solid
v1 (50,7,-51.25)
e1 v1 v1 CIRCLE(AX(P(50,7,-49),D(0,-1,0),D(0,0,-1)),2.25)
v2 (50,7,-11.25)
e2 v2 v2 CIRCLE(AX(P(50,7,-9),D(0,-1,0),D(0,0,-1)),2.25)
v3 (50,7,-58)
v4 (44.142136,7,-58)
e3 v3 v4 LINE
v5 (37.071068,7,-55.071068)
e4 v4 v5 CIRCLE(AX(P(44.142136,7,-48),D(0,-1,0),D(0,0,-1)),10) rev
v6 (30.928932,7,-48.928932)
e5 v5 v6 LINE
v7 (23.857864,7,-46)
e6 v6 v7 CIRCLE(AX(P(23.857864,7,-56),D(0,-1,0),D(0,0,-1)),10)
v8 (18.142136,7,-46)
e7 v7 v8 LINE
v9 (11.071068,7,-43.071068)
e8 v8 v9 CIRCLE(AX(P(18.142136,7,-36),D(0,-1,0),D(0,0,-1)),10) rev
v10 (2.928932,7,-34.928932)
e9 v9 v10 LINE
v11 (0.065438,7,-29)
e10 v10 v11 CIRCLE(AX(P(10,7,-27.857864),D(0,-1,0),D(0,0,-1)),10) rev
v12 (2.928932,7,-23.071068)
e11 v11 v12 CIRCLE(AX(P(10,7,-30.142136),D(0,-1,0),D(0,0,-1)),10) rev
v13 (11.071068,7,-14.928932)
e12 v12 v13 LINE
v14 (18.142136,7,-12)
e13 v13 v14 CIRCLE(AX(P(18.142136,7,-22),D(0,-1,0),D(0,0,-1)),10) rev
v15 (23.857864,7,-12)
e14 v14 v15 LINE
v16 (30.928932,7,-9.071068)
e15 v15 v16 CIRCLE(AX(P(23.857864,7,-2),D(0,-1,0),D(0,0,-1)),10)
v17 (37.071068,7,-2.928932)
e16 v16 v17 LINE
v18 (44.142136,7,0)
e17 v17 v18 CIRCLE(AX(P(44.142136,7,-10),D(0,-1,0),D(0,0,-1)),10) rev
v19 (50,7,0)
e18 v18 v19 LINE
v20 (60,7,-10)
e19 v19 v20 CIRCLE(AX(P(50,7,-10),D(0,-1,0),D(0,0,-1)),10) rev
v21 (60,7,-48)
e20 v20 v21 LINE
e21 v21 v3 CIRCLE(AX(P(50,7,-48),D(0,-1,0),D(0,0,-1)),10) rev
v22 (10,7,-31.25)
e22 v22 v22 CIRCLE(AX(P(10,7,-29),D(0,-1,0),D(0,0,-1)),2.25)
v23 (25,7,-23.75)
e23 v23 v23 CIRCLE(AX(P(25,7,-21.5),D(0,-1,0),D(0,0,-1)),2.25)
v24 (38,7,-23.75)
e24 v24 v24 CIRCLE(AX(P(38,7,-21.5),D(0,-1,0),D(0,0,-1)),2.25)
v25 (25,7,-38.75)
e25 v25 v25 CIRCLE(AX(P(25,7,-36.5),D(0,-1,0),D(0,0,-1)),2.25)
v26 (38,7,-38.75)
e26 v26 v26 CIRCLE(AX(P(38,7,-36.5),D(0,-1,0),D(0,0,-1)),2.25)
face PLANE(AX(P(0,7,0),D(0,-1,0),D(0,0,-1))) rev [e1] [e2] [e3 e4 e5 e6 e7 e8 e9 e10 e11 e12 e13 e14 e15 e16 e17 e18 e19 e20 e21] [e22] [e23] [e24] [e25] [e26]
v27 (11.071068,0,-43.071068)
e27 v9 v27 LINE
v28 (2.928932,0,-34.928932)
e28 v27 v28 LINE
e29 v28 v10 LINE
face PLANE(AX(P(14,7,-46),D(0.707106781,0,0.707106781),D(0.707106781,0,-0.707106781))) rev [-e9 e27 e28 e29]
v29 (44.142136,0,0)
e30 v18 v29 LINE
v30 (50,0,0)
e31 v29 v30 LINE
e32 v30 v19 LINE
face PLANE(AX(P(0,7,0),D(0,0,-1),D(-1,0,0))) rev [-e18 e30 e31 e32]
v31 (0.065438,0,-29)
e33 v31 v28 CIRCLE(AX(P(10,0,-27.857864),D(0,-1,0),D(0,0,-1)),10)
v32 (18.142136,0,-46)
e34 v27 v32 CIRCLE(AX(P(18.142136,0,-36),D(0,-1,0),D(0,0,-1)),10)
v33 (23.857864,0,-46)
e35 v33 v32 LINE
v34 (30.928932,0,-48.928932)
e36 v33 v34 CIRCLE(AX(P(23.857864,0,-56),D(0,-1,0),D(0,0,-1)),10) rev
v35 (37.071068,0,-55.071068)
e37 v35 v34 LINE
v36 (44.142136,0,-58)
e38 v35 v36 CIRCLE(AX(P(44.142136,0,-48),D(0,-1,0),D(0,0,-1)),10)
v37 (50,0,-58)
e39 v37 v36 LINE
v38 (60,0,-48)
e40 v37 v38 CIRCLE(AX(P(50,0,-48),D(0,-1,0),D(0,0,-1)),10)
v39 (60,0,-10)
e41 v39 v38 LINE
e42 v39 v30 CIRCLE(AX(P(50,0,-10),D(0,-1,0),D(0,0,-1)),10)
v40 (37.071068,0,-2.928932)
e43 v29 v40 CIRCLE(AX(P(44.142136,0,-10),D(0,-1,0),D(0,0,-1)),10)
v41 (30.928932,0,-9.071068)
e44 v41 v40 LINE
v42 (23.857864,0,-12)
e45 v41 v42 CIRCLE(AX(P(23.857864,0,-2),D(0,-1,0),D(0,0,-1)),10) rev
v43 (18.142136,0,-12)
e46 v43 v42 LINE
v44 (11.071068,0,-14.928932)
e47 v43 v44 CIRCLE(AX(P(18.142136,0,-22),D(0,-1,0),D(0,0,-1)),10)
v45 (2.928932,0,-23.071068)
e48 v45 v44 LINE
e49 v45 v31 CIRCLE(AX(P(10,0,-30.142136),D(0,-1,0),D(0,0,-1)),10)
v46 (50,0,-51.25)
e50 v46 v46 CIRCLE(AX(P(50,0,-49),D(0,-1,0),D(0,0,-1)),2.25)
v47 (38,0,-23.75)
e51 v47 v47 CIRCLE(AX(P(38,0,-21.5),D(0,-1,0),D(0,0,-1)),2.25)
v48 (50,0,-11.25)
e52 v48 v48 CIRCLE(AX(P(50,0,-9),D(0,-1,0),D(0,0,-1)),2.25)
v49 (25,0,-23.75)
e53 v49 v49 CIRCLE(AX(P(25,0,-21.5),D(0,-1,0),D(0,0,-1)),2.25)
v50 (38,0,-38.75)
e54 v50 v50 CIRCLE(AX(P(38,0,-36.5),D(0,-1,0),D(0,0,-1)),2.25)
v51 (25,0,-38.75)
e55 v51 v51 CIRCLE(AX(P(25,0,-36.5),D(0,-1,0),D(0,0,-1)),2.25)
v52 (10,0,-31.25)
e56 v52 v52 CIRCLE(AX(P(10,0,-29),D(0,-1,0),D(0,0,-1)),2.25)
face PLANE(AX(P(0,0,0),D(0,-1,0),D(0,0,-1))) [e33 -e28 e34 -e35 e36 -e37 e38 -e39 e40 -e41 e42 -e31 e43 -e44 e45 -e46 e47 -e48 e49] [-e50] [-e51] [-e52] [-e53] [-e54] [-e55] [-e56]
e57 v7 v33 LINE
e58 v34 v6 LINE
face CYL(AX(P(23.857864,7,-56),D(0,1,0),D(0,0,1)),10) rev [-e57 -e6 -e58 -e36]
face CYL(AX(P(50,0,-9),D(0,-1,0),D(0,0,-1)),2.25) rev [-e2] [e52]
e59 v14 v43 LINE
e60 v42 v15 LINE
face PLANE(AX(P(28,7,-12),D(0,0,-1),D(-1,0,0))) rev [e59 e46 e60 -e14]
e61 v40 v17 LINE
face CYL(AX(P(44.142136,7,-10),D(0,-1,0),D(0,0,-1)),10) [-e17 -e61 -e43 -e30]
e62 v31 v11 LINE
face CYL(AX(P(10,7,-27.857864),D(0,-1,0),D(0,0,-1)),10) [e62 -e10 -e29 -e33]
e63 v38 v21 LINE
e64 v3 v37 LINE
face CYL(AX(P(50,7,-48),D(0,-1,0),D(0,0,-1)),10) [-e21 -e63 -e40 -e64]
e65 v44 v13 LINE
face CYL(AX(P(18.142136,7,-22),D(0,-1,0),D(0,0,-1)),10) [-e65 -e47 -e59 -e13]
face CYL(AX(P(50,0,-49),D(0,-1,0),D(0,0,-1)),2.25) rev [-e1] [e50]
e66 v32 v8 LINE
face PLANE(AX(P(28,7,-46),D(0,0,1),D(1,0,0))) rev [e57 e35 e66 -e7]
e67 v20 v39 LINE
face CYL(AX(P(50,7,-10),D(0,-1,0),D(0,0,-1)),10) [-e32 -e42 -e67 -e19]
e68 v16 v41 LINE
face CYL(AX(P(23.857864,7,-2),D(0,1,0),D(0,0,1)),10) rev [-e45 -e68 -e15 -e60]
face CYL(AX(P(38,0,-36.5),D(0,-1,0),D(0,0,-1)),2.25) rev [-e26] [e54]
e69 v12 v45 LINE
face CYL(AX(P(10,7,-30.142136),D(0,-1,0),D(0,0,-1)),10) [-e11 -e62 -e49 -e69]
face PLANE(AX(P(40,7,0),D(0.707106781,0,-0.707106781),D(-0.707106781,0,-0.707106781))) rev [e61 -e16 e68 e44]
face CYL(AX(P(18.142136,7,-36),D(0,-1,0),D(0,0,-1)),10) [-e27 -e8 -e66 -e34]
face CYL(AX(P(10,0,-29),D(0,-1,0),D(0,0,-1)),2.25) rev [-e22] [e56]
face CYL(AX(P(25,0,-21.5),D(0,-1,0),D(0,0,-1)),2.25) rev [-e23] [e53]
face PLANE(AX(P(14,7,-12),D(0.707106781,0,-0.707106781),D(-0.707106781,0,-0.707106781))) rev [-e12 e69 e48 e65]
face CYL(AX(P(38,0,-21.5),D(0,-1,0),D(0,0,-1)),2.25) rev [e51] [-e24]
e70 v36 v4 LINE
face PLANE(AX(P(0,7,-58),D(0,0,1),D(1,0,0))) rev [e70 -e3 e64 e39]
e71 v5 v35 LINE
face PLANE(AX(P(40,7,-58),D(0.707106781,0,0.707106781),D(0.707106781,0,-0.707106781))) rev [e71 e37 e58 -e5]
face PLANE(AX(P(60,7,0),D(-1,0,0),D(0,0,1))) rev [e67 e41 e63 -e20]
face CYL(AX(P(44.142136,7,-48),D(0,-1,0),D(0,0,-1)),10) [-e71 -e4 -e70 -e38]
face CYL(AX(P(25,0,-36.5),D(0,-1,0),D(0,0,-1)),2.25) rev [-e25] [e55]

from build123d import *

# Parameters (mm, degrees)
SKETCH1_W            = 60
SKETCH1_H            = 58
BOSS_EXTRUDE1_DEPTH  = 7
M4_CLEARANCE_HOLE2_D = 4.5
LPATTERN1_COUNT      = 2
LPATTERN1_PITCH      = 13
M4_CLEARANCE_HOLE4_D = 4.5
CUT_EXTRUDE5_DEPTH   = 84.743656476
FILLET3_R            = 10


with BuildPart() as part:
    # Sketch1 → Boss-Extrude1 (new body)
    with BuildSketch(Plane(origin=(0, 0, 0), x_dir=(1, 0, 0), z_dir=(0, 1, 0))):
        with Locations((30, 29)):
            Rectangle(SKETCH1_W, SKETCH1_H)
    extrude(amount=BOSS_EXTRUDE1_DEPTH)

    # M4 Clearance Hole2 (through all)
    with Locations(Plane(origin=(0, 0, 0), x_dir=(-1, 0, 0), z_dir=(0, -1, 0))):
        with Locations((-25, 36.5), (-25, 21.5)):
            m4_clearance_hole2 = Hole(M4_CLEARANCE_HOLE2_D / 2)

    # LPattern1: M4 Clearance Hole2 ×2
    with Locations(*[(i * LPATTERN1_PITCH, 0, 0) for i in range(1, LPATTERN1_COUNT)]):
        add(m4_clearance_hole2, mode=Mode.SUBTRACT)

    # M4 Clearance Hole4 (through all)
    with Locations(Plane(origin=(0, 0, 0), x_dir=(-1, 0, 0), z_dir=(0, -1, 0))):
        with Locations((-50, 49), (-50, 9), (-10, 29)):
            Hole(M4_CLEARANCE_HOLE4_D / 2)

    # Sketch29 → Cut-Extrude5 (cut, through all)
    with BuildSketch(Plane.XZ):
        Polygon((40, 0), (28, -12), (14, -12), (0, -26), (0, 0), align=None)
        Polygon((0, -32), (0, -58), (40, -58), (28, -46), (14, -46), align=None)
    extrude(amount=-CUT_EXTRUDE5_DEPTH, mode=Mode.SUBTRACT)

    # Fillet3
    # the kernel refuses this fillet: 10 mm, written as the material it adds along each edge
    with BuildSketch(Plane(origin=(28, 0, -46), x_dir=(-1, 0, 0), z_dir=(0, 1, 0)), Plane(origin=(28, 0, -12), x_dir=(0.7071067811865417, 0, 0.7071067811865532), z_dir=(0, 1, 0))) as fillet3_piece_1:
        with BuildLine():
            CenterArc((FILLET3_R * 0.414213562373, -FILLET3_R), FILLET3_R, 90, 45)
            Line((-FILLET3_R * 0.292893218813, -FILLET3_R * 0.292893218813), (0, 0))
            Line((0, 0), (FILLET3_R * 0.414213562373, 0))
        make_face()
    extrude(amount=7)
    # the kernel refuses this fillet: 10 mm, written as the material it takes off along each edge
    with BuildSketch(Plane(origin=(60, -25, 0), x_dir=(-1, 0, 0), z_dir=(0, 1, 0)), Plane(origin=(60, -25, -58), x_dir=(0, 0, 1), z_dir=(0, 1, 0))) as fillet3_2_piece_1:
        with BuildLine():
            CenterArc((FILLET3_R, -FILLET3_R), FILLET3_R, 90, 90)
            Line((0, -FILLET3_R), (0, 0))
            Line((0, 0), (FILLET3_R, 0))
        make_face()
    extrude(amount=57, mode=Mode.SUBTRACT)
    with BuildSketch(Plane(origin=(40, -10.355339059, -58), x_dir=(-0.7071067811865415, 0, 0.7071067811865536), z_dir=(0, 1, 0)), Plane(origin=(14, -10.355339059, -46), x_dir=(-0.7071067811865411, 0, 0.707106781186554), z_dir=(0, 1, 0)), Plane(origin=(0, -10.355339059, -32), x_dir=(0, 0, 1), z_dir=(0, 1, 0)), Plane(origin=(0, -10.355339059, -26), x_dir=(0.7071067811865417, 0, 0.7071067811865532), z_dir=(0, 1, 0)), Plane(origin=(14, -10.355339059, -12), x_dir=(1, 0, 0), z_dir=(0, 1, 0)), Plane(origin=(40, -10.355339059, 0), x_dir=(1, 0, 0), z_dir=(0, 1, 0))) as fillet3_2_piece_2:
        with BuildLine():
            CenterArc((FILLET3_R * 0.414213562373, FILLET3_R), FILLET3_R, 225, 45)
            Line((-FILLET3_R * 0.292893218813, FILLET3_R * 0.292893218813), (0, 0))
            Line((0, 0), (FILLET3_R * 0.414213562373, 0))
        make_face()
    extrude(amount=27.710678119, mode=Mode.SUBTRACT)


solid = part.part
